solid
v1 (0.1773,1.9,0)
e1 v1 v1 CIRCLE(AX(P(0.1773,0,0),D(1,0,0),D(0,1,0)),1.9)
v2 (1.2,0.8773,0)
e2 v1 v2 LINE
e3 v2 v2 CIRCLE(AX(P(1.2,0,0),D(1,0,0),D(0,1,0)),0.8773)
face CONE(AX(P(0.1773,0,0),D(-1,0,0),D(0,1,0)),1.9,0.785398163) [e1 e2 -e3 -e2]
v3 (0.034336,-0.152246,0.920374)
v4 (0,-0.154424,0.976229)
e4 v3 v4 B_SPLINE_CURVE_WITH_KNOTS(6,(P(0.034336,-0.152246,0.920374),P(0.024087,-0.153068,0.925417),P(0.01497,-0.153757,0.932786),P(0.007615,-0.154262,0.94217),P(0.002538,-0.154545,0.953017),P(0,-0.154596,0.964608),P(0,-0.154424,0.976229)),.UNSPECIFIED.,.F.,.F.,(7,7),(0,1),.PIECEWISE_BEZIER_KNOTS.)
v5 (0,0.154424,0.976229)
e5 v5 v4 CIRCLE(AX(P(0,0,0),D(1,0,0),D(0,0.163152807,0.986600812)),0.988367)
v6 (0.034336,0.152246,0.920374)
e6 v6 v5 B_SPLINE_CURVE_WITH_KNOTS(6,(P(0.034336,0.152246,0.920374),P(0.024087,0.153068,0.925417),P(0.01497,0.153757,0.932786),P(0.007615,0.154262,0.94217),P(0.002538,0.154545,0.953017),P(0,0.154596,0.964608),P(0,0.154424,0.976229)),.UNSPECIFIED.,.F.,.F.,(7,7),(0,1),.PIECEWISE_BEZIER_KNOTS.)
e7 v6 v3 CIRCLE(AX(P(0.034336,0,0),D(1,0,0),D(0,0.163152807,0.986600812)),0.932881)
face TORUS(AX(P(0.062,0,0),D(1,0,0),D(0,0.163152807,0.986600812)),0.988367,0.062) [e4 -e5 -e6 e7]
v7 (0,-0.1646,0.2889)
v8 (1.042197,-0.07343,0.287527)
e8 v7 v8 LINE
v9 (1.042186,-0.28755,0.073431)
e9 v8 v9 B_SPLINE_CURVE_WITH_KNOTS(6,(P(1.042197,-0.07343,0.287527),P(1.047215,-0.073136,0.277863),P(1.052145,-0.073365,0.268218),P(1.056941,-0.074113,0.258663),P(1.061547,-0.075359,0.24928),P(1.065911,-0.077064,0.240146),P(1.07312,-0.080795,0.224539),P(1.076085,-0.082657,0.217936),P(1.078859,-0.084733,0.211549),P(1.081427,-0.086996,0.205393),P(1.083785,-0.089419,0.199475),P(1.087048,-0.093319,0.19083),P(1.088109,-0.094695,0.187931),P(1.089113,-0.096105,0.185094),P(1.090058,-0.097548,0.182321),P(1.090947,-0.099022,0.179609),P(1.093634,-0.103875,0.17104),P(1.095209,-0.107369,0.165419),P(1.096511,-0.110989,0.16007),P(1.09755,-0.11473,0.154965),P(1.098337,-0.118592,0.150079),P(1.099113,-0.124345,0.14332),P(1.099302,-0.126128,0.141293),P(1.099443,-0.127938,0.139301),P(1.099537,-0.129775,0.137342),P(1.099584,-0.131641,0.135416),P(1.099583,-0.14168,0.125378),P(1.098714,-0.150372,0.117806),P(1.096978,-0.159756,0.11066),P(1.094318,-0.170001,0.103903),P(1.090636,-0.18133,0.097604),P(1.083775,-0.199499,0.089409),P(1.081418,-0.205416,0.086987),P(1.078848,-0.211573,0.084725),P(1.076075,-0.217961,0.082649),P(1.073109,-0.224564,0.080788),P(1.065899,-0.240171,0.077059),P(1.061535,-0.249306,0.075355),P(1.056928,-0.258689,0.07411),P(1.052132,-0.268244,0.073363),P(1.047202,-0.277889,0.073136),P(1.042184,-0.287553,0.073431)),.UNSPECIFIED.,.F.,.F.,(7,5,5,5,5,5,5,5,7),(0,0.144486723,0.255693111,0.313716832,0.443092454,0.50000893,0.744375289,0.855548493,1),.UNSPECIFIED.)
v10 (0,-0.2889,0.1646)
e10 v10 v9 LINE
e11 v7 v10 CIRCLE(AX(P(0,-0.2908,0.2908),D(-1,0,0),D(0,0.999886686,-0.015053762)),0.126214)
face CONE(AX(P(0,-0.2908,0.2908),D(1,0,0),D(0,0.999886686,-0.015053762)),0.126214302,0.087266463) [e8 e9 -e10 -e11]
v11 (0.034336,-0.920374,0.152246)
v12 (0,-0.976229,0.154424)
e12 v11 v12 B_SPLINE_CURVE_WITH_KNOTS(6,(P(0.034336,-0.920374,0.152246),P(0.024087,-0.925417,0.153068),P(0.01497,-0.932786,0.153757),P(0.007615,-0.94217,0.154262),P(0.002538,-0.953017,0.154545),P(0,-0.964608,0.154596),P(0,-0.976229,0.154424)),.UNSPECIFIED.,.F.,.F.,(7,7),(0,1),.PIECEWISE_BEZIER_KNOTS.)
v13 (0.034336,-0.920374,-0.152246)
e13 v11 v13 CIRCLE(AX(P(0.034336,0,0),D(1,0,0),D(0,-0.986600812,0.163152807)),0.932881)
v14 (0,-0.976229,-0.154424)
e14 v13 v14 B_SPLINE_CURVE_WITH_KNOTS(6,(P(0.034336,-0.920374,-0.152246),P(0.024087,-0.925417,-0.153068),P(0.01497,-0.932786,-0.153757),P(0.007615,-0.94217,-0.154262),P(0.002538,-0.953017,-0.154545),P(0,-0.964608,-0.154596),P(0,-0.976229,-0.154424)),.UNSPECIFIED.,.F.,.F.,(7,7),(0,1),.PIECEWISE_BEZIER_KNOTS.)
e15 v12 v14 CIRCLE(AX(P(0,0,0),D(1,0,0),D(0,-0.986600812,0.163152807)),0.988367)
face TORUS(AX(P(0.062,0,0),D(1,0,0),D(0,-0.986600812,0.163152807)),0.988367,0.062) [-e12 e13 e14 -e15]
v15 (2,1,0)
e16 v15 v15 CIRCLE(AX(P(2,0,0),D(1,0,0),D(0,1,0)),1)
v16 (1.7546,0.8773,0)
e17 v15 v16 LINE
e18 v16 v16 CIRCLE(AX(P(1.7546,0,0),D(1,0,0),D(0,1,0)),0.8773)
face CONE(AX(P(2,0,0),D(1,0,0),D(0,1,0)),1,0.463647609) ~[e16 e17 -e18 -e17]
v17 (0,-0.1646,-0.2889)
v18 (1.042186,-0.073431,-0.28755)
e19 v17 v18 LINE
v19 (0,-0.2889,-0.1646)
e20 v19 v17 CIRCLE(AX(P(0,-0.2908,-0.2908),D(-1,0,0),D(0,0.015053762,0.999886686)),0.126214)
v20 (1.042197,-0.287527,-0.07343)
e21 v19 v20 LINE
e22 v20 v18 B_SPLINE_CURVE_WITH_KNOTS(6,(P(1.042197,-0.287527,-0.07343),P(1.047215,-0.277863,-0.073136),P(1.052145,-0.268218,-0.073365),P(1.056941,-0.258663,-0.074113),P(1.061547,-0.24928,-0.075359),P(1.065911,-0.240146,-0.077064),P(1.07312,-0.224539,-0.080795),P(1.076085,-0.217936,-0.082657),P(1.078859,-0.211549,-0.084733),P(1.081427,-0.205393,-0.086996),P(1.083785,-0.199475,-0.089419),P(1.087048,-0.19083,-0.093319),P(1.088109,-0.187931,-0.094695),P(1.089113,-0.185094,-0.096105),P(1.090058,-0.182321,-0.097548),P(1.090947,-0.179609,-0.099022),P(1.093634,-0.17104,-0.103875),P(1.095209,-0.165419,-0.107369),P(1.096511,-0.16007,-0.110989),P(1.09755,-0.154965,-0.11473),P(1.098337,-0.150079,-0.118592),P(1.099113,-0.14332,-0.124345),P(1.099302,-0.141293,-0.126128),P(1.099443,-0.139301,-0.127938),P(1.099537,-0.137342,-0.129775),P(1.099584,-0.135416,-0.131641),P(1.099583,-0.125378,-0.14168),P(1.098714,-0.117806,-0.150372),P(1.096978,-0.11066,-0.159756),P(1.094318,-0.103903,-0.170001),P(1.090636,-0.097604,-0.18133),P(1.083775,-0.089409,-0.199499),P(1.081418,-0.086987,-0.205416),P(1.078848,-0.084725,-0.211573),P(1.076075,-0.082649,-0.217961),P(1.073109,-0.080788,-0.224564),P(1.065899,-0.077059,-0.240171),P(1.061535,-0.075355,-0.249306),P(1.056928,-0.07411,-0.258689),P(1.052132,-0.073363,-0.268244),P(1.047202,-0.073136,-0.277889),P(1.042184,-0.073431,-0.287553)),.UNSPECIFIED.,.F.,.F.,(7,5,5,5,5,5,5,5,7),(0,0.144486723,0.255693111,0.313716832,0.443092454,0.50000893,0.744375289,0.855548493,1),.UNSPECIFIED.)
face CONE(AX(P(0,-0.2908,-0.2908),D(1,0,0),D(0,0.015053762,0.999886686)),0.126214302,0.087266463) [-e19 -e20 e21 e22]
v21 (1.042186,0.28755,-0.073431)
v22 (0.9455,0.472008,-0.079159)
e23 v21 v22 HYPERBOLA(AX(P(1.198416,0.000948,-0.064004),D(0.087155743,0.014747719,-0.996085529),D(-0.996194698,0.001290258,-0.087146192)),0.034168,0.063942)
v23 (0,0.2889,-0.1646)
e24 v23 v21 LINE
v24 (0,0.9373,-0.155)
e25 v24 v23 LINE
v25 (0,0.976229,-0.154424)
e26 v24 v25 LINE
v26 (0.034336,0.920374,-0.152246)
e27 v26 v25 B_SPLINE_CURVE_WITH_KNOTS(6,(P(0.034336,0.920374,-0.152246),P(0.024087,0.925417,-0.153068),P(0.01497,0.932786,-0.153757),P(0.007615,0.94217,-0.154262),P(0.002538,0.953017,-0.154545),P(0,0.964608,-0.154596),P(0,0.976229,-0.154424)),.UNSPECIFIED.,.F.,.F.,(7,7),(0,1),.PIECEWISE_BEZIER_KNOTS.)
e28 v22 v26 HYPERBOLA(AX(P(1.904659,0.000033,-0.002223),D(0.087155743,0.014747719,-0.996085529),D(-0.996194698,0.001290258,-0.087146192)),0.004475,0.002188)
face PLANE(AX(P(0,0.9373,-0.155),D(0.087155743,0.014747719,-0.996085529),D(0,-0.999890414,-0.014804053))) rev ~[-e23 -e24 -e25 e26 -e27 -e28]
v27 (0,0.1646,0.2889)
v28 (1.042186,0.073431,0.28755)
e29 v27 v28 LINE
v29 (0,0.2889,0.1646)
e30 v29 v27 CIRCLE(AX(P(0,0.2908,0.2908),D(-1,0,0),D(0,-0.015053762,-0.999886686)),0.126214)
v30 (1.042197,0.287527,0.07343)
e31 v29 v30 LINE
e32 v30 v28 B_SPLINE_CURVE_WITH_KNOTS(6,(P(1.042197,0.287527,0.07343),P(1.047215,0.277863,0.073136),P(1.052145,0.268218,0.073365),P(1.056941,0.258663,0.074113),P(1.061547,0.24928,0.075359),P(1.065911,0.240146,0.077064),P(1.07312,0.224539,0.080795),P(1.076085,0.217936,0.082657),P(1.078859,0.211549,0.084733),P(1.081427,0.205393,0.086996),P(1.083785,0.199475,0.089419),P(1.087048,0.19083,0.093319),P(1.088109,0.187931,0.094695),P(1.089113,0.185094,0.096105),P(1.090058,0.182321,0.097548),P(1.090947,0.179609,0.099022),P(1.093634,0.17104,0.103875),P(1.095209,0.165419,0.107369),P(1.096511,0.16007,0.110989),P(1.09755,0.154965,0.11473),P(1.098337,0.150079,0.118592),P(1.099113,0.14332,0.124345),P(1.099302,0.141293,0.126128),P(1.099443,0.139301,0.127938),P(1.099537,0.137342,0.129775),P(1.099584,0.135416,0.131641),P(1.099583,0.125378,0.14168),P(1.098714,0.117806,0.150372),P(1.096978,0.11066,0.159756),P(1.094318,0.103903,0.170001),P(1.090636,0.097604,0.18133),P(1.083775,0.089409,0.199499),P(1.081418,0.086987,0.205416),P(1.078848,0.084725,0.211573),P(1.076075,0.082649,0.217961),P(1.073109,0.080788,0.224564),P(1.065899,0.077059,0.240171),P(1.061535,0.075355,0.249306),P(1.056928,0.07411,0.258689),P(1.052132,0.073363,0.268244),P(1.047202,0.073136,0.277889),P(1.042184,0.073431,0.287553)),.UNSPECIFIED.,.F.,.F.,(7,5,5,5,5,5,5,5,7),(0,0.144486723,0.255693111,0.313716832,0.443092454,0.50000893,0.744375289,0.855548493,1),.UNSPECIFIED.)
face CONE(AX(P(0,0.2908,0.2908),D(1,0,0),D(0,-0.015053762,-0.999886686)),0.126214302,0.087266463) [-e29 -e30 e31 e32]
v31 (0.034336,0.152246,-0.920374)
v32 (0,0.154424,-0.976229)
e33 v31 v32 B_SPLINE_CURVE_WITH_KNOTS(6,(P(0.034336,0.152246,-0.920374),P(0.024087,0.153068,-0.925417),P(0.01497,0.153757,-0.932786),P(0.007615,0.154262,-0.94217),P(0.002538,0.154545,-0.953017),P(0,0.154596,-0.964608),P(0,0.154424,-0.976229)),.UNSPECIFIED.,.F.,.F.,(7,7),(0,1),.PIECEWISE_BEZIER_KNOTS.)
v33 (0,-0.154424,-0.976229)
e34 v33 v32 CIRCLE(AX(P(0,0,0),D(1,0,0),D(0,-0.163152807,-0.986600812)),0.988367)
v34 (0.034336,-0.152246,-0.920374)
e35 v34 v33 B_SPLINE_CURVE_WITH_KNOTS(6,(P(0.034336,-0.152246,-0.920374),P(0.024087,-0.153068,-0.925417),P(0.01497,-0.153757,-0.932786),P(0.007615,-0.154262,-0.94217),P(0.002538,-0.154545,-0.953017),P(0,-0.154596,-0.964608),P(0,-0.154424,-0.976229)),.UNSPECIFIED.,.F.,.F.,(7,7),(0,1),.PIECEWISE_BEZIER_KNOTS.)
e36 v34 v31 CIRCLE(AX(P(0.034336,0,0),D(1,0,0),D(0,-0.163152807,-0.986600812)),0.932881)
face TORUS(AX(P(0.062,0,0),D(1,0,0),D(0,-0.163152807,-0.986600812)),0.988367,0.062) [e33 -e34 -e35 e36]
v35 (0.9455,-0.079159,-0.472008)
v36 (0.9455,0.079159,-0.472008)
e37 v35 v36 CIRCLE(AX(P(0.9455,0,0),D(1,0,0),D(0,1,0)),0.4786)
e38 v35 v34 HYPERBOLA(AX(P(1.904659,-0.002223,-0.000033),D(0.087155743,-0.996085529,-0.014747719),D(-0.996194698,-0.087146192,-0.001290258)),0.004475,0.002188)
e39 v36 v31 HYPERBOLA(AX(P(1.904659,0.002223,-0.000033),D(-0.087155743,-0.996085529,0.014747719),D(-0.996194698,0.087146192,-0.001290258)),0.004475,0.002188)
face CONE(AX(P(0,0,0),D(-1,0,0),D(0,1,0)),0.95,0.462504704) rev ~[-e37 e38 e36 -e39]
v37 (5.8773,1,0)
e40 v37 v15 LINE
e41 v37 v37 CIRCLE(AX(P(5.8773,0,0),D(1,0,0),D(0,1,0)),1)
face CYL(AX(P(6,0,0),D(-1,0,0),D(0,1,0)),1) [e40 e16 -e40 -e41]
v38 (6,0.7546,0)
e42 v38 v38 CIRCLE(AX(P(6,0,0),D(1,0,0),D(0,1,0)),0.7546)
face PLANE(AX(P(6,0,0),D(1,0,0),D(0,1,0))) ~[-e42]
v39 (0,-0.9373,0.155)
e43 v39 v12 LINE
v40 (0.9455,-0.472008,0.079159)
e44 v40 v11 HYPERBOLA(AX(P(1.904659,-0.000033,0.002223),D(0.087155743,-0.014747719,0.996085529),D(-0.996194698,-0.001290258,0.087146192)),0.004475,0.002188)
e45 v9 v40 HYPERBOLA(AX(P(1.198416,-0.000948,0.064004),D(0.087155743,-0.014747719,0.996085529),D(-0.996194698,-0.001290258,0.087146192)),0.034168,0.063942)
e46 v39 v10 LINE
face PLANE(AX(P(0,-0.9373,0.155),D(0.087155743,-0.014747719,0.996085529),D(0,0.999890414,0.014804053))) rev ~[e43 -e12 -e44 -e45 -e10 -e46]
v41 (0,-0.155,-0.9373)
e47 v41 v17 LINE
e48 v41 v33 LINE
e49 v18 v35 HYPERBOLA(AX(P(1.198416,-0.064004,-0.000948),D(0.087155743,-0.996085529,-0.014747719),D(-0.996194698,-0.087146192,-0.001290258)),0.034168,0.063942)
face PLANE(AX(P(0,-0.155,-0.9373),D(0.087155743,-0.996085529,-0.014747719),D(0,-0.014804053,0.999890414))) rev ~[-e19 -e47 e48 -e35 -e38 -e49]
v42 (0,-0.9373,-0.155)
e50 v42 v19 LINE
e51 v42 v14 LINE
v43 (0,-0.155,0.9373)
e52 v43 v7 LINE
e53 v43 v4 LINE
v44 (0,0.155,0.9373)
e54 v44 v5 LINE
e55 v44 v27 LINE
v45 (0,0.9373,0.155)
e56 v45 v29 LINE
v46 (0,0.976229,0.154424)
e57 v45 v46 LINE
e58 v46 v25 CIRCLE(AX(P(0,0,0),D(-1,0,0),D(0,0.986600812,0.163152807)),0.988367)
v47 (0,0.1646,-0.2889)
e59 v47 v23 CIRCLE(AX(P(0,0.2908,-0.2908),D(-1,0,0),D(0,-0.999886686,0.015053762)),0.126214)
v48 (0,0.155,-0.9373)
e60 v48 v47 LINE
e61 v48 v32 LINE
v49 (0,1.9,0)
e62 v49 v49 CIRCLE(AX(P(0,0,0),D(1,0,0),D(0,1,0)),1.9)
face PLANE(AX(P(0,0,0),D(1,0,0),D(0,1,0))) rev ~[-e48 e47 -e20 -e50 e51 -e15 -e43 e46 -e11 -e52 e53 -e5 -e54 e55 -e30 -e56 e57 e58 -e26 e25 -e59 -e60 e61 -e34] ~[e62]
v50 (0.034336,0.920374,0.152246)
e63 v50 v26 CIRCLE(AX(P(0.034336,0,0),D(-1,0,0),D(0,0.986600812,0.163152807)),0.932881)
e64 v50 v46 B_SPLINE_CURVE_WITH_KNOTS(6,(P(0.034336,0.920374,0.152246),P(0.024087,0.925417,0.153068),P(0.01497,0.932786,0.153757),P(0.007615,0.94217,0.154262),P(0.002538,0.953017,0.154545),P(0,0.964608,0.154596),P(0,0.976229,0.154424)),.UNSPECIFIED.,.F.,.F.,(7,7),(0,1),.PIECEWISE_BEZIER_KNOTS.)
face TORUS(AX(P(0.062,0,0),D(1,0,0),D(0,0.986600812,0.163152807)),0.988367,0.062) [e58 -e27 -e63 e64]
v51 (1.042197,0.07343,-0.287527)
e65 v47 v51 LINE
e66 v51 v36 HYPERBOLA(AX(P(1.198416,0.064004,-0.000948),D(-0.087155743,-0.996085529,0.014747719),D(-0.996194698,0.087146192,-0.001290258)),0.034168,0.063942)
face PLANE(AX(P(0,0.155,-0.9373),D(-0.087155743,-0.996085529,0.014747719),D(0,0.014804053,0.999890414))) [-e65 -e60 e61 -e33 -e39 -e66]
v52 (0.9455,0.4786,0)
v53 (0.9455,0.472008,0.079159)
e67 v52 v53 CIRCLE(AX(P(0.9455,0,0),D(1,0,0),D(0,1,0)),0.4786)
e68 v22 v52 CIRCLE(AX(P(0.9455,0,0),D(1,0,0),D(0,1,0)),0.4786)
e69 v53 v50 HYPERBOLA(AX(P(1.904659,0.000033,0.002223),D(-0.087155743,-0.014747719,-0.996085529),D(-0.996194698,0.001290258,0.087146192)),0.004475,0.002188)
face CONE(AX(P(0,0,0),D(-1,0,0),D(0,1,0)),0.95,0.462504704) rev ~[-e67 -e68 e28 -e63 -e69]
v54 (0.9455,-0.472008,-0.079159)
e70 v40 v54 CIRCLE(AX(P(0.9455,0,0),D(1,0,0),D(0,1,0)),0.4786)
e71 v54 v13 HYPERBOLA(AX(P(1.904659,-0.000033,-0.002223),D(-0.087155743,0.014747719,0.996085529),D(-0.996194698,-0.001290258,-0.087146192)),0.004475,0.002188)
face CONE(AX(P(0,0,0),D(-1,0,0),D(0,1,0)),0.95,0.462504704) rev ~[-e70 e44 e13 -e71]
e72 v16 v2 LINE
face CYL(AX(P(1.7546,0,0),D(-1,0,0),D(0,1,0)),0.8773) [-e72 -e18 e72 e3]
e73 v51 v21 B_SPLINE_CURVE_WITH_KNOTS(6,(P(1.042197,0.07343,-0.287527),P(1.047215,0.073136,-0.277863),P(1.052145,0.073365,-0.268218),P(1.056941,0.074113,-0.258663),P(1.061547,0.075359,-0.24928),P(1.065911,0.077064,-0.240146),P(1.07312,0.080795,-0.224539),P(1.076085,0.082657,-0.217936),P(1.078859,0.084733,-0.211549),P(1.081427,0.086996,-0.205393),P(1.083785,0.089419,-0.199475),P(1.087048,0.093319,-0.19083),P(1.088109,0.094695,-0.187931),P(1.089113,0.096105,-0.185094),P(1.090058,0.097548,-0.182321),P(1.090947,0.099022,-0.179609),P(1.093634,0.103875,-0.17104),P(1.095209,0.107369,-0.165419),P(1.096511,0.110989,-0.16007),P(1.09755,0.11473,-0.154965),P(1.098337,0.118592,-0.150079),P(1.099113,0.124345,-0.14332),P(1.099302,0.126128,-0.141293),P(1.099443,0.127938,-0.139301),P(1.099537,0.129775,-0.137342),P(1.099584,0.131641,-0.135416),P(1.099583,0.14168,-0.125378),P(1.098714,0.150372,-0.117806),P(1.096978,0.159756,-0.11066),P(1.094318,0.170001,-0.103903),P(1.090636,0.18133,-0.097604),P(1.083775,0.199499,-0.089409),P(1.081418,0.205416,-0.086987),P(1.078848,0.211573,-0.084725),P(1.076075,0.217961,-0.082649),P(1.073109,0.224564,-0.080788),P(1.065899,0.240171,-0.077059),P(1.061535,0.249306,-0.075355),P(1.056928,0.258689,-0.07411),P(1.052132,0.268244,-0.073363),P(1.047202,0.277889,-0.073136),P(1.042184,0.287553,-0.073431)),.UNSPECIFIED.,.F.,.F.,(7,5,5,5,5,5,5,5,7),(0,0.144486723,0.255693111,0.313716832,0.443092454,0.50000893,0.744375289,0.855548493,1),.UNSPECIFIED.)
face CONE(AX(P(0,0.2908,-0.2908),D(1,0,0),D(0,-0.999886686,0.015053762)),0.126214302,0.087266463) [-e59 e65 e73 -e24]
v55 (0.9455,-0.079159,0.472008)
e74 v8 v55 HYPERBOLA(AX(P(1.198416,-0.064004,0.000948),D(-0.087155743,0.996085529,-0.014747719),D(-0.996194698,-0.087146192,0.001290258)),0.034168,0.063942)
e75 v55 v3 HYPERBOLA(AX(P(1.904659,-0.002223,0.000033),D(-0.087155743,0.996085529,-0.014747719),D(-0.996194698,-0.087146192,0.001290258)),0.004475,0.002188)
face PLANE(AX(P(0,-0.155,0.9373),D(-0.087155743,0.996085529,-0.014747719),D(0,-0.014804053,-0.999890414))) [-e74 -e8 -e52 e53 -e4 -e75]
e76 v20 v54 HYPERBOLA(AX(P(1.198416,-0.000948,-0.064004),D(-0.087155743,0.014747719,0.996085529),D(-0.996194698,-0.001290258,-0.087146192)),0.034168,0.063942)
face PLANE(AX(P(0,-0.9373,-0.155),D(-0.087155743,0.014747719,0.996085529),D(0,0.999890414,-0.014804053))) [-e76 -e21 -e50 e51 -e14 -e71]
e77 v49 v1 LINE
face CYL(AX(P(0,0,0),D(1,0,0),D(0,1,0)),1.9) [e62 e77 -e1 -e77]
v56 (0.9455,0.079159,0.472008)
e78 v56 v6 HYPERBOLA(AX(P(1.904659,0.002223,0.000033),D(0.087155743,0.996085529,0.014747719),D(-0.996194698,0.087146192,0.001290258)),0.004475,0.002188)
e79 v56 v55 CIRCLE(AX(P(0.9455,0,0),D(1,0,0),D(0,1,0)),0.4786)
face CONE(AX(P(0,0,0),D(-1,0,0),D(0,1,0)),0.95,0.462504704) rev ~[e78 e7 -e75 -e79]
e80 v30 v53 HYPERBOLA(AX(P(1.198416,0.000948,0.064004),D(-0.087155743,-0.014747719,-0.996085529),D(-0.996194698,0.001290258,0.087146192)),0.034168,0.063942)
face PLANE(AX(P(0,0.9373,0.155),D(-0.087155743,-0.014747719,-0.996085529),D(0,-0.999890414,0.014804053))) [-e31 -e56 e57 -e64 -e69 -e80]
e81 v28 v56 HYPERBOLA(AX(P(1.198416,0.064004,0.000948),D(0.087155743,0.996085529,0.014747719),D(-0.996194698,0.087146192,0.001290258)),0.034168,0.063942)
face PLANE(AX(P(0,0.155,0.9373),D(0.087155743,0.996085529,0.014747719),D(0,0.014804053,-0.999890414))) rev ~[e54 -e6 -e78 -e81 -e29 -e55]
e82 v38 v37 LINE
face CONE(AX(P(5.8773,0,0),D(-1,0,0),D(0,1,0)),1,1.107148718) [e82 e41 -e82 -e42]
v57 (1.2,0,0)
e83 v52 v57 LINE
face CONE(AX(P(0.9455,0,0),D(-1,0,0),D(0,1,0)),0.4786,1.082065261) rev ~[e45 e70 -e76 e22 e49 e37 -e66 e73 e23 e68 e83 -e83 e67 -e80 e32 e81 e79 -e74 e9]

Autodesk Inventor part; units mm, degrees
ref_plane "YZ Plane" through (0, 0, 0) normal (1, 0, 0) x (0, 1, 0)
ref_plane "XZ Plane" through (0, 0, 0) normal (0, 1, 0) x (-1, 0, 0)
sketch "Sketch1" plane through (0, 0, 0) normal (0, 0, 1) x (1, 0, 0)
  line L0 (1.2, 0) -> (6, 0)
  line L1 (6, 0) -> (6, 1)
  line L2 (6, 1) -> (2, 1)
  line L3 (2, 1) -> (1.7546, 0.8773)
  line L4 (1.7546, 0.8773) -> (1.2, 0.8773)
  line L5 (0, 1.9) -> (0, 0.95)
  line L6 (0, 0.95) -> (0.9455, 0.4786)
  line L7 (0.9455, 0.4786) -> (1.2, 0)
  line L8 (-1.2, 0) -> (7.2, 0) projected
  line L9 (0, -0.38) -> (0, 2.28) projected
  line L10 (0, 1.9) -> (0.1773, 1.9)
  line L11 (0.1773, 1.9) -> (1.2, 0.8773)
  line L12 (2, 1) -> (1.0773, 1) construction
  dimension "d1" = 4
  dimension "d2" = 2
  dimension "d3" = 1.7546
  dimension "d4" = 1.9
  dimension "d5" = 26.5
  dimension "d6" = 62
  dimension "d7" = 1.2
  dimension "d8" = 0.2454
  dimension "d12" = 3.8
  dimension "d13" = 45
  dimension "d15" = 6
  dimension "d24" = 1.2
revolve "Body" add sketch "Sketch1" angle 360 about axis through (1.2, 0, 0) along (1, 0, 0) contours L7 L6 L5 L10 L11 L4 L3 L2 L1 L0
sketch "Sketch2" plane through (0, 0, 0) normal (-1, 0, 0) x (0, 0, 1)
  line L0 (0, 0.95) -> (0, 0) construction
  line L1 (0, 0) -> (0.95, 0) construction
  arc A0 (0.285, 0) -> (0, 0.285) centre (0, 0) ccw construction
  arc A1 (0.3325, 0) -> (0, 0.3325) centre (0, 0) ccw construction
  arc A2 (0.9373, 0.155) -> (0.155, 0.9373) centre (0, 0) ccw
  line L2 (0, 0) -> (0.6718, 0.6718) construction
  line L3 (0.155, 0.9373) -> (0.1646, 0.2889)
  line L4 (0.9373, 0.155) -> (0.2889, 0.1646)
  arc A3 (0.155, 0.9373) -> (0, 0.95) centre (0, 0) ccw
  arc A4 (0.95, 0) -> (0.9373, 0.155) centre (0, 0) ccw
  line L5 (0, -2.66) -> (0, 2.66) projected
  line L6 (-2.66, 0) -> (2.66, 0) projected
  arc A5 (0.155, -0.9373) -> (0.9373, -0.155) centre (0, 0) ccw
  line L7 (0.155, -0.9373) -> (0.1646, -0.2889)
  line L8 (0.9373, -0.155) -> (0.2889, -0.1646)
  arc A6 (0, -0.95) -> (0.155, -0.9373) centre (0, 0) ccw
  arc A7 (0.9373, -0.155) -> (0.95, 0) centre (0, 0) ccw
  arc A8 (-0.155, 0.9373) -> (-0.9373, 0.155) centre (0, 0) ccw
  line L9 (-0.155, 0.9373) -> (-0.1646, 0.2889)
  line L10 (-0.9373, 0.155) -> (-0.2889, 0.1646)
  arc A9 (0, 0.95) -> (-0.155, 0.9373) centre (0, 0) ccw
  arc A10 (-0.9373, 0.155) -> (-0.95, 0) centre (0, 0) ccw
  arc A11 (-0.155, -0.9373) -> (0, -0.95) centre (0, 0) ccw
  arc A12 (-0.9373, -0.155) -> (-0.155, -0.9373) centre (0, 0) ccw
  arc A13 (-0.95, 0) -> (-0.9373, -0.155) centre (0, 0) ccw
  line L11 (-0.9373, -0.155) -> (-0.2889, -0.1646)
  line L12 (-0.155, -0.9373) -> (-0.1646, -0.2889)
  arc A14 (0.1646, 0.2889) -> (0.2889, 0.1646) centre (0.2908, 0.2908) ccw
  arc A15 (0.2889, -0.1646) -> (0.1646, -0.2889) centre (0.2908, -0.2908) ccw
  arc A16 (-0.2889, 0.1646) -> (-0.1646, 0.2889) centre (-0.2908, 0.2908) ccw
  arc A17 (-0.1646, -0.2889) -> (-0.2889, -0.1646) centre (-0.2908, -0.2908) ccw
  point P0 (0.6718, -0.6718)
  point P1 (-0.6718, 0.6718)
  point P2 (-0.6718, -0.6718)
  dimension "d17" = 0.57
  dimension "d18" = 0.665
  dimension "d19" = 1.9
  dimension "d20" = 45
  dimension "d21" = 0.155
extrude "Slot" add sketch "Sketch2" against normal up to next draft 5 contours L4 A14 L3 A2 | A5 L7 A15 L8 | L9 A16 L10 A8 | A12 L11 A17 L12
fillet "Fillet1" radius 0.062 4 edges at (0, 0.95, 0) (0, 0, -0.95) (0, -0.95, 0) (0, 0, 0.95)
thread "Thread" size "M2x0.4" class "6g" standard "ISO Metric profile" length 4
chamfer "Chamfer1" distance 0.2454 distance2 0.1227 1 edges at (6, -1, 0) measured on face at (6, 0.3275, -0.4215)
ref_plane "Work Plane2" through (3.35, 0, 0) normal (0, 0, -1) x (1, 0, 0)
equation "\"d1\" = GEL"
equation "\"d2\" = GD"
equation "\"d3\" = BDM"
equation "\"d4\" = SDM"
equation "\"d7\" = INTI"
equation "\"d8\" = GAL"
equation "\"d12\" = KOD"
equation "\"d13\" = 0.5 * SEWI"
equation "\"d15\" = NLG"
equation "\"d24\" = KOH"
equation "\"d17\" = 0.3 * SDM"
equation "\"d18\" = 0.35 * SDM"
equation "\"d19\" = SDM"
equation "\"d21\" = 0.5 * SBR"
equation "\"d23\" = 0.2 * SBR"
equation "\"d10\" = GEL"
equation "\"d25\" = -0.5 * SPD + 0.5 * GD"
equation "\"d26\" = 0.5 * GAL"
equation "\"NLG\" = 6"
equation "\"GEL\" = 4"
equation "\"GAL\" = 0.61345 * PTC"
equation "\"SPD\" = NND - 1.2269 * PTC"
equation "\"KOD\" = 3.8"
equation "\"KOH\" = 1.2"
equation "\"SBR\" = 0.31"
equation "\"INTI\" = 1.2"
equation "\"SDM\" = 1.9"
equation "\"GD\" = NND"
equation "\"BDM\" = NND - GAL"
equation "\"SEWI\" = 90deg"
equation "\"d9\" = SDM"
equation "\"GUL\" = 0.61345 * PTC"
equation "\"TOA\" = 30deg"
equation "\"EPV\" = 2.2"
equation "\"THREADDIA\" = 2"
equation "\"PTC\" = 0.4"
equation "\"NND\" = 2"
equation "\"GD1\" = THREADDIA - 1.2269 * PTC"
properties part number "ISO 7046-1 - M2 x 6 - 4.8 - H" material "Steel"
